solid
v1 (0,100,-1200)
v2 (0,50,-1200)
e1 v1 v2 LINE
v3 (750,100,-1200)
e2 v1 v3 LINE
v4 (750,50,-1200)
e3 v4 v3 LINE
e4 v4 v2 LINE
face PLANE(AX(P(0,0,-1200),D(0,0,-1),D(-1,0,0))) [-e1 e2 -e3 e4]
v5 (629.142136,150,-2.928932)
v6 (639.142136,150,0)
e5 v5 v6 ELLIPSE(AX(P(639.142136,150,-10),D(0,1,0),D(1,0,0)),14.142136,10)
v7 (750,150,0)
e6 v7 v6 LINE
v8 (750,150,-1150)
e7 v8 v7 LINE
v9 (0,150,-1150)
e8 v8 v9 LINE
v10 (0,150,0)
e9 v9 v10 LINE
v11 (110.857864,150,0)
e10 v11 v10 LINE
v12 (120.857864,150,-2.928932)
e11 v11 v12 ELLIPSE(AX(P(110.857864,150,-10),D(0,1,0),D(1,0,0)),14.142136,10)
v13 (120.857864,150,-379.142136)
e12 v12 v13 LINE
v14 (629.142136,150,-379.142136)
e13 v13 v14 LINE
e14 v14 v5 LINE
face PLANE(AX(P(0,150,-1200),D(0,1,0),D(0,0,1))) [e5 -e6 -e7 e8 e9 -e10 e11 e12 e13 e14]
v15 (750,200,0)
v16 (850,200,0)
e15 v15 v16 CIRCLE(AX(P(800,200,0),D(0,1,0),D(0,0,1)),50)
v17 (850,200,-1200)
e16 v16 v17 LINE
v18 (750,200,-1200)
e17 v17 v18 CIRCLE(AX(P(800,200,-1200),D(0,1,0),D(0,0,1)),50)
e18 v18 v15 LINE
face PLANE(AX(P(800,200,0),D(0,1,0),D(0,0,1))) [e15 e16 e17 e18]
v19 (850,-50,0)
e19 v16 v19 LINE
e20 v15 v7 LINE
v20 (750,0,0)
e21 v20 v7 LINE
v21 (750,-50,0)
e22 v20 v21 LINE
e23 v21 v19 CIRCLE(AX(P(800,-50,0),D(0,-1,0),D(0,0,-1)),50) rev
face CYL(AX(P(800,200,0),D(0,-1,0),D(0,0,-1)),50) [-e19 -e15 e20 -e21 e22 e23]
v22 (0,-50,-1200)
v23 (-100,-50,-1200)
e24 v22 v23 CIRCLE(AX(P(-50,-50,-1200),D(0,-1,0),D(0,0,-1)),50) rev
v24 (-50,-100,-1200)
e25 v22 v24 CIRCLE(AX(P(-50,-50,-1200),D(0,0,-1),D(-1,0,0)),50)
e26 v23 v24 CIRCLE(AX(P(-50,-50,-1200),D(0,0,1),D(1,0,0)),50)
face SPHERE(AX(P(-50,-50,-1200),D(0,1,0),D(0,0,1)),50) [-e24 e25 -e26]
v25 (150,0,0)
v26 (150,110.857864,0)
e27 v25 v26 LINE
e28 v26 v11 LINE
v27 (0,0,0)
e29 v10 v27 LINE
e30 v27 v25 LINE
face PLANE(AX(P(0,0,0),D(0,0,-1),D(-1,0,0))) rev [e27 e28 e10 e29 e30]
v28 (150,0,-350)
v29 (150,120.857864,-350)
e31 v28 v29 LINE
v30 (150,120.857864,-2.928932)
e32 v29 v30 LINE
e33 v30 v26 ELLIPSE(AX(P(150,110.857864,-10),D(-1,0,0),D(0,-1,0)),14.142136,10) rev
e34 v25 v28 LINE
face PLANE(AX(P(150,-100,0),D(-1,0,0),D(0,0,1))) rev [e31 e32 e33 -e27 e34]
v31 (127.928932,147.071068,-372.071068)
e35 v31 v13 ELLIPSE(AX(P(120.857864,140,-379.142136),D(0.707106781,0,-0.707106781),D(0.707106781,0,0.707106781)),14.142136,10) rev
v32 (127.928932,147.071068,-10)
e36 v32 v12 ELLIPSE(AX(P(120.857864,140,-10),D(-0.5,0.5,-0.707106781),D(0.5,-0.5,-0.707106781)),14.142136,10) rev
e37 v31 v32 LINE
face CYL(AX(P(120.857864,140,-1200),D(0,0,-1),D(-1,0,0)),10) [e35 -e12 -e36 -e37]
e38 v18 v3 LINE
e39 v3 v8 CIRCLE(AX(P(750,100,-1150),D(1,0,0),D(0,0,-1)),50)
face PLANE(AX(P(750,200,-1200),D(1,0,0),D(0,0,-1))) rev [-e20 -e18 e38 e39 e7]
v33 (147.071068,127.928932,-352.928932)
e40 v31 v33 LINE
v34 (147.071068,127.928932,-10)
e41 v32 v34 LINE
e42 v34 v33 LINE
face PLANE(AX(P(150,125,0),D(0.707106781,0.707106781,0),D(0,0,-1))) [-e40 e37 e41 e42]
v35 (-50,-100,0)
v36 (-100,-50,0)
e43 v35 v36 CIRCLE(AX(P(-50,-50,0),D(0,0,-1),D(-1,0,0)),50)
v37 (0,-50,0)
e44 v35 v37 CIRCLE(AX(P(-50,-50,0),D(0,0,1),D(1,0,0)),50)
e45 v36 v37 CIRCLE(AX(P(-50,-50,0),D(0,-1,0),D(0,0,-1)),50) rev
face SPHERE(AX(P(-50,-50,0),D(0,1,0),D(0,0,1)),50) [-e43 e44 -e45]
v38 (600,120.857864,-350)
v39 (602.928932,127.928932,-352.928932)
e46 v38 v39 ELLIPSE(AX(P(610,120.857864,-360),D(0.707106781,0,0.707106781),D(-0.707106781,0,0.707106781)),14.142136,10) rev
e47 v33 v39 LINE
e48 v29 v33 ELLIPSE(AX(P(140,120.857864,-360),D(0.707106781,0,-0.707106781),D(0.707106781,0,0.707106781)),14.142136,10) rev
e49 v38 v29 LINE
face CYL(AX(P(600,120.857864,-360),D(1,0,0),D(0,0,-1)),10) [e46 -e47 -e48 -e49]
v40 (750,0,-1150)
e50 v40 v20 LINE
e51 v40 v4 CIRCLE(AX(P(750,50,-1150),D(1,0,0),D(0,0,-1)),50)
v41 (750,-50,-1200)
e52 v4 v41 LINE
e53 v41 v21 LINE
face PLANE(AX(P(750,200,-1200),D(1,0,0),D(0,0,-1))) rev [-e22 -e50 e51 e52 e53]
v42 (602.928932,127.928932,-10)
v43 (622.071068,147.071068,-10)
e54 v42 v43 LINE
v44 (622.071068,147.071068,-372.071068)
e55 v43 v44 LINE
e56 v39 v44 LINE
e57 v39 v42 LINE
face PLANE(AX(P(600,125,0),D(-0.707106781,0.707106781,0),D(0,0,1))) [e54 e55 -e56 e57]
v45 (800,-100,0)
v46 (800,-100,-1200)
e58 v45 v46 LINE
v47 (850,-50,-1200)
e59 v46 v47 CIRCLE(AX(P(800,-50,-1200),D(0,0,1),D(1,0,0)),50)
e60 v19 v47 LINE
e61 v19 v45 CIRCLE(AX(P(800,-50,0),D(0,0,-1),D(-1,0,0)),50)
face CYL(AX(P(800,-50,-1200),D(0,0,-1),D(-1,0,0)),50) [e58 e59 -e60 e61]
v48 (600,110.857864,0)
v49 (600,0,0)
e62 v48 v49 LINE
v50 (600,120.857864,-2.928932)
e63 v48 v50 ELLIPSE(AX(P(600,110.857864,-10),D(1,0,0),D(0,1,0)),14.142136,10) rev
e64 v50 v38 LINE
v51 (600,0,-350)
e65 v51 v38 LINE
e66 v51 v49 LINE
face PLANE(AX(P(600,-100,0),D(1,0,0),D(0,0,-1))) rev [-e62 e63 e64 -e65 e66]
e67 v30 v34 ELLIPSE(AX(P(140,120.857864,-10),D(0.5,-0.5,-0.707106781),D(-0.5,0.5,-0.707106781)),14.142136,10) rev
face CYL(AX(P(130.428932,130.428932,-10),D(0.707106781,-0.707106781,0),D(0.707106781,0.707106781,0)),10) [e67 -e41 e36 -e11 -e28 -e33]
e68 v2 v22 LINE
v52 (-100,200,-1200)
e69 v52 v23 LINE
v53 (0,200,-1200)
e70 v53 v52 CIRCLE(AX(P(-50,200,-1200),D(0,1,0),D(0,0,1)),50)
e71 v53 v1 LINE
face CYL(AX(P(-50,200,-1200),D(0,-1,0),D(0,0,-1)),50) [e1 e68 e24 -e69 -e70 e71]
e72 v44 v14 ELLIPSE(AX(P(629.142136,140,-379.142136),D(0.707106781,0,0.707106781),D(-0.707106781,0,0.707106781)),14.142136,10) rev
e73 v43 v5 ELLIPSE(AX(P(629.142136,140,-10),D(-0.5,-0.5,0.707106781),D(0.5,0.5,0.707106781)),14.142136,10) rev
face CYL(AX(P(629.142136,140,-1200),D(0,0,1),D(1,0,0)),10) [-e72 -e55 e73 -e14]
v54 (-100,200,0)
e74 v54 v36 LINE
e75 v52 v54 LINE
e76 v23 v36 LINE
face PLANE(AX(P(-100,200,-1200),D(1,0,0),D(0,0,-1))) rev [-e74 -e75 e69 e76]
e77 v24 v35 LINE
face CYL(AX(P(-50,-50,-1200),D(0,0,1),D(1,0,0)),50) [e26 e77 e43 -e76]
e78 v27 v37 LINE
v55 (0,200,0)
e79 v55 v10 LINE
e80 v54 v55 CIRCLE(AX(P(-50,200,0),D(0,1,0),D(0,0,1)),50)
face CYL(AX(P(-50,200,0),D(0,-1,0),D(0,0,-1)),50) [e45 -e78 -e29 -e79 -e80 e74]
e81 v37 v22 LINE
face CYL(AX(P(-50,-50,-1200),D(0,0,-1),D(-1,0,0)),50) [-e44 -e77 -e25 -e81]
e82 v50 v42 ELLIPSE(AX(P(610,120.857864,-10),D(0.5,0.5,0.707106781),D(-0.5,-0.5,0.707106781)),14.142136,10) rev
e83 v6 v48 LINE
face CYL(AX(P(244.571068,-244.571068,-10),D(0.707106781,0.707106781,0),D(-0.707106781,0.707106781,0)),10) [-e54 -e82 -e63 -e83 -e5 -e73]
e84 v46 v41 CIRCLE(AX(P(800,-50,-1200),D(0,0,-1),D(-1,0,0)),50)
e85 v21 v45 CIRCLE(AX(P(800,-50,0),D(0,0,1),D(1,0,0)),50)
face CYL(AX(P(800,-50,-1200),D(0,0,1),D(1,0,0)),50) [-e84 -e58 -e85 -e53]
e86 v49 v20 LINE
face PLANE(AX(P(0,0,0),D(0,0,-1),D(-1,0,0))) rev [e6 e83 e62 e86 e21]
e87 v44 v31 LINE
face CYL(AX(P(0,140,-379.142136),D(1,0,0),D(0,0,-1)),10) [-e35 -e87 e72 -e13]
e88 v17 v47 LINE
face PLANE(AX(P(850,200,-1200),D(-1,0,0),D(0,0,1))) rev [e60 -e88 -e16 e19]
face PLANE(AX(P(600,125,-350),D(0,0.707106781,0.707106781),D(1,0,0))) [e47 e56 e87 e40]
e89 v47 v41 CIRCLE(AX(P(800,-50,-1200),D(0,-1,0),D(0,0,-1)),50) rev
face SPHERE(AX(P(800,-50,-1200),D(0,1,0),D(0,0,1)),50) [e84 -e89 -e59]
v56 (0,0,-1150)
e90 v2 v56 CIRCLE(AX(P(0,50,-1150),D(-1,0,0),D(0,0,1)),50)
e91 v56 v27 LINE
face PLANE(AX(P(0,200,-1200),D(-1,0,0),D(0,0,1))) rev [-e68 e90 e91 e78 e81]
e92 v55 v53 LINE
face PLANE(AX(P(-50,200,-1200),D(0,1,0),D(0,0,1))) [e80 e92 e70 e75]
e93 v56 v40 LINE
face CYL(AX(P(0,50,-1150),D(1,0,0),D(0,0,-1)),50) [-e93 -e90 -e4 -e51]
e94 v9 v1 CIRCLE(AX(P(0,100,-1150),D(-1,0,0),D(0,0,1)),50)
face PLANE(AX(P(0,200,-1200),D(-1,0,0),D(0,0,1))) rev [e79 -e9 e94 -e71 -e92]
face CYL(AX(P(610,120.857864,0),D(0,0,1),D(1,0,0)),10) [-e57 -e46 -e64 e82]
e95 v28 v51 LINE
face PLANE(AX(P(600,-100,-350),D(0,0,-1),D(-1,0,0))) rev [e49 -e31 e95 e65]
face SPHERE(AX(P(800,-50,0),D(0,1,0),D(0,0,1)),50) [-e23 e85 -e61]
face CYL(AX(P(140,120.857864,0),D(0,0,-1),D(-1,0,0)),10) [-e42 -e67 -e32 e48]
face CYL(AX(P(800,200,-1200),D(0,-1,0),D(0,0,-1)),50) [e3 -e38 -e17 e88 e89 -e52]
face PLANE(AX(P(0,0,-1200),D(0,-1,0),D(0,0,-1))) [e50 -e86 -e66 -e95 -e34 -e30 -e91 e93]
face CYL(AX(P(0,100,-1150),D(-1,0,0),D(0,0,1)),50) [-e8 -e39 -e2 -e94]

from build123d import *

# Parameters (mm, degrees)
SKETCH1_W                = 750
SKETCH1_H                = 150
BOSS_EXTRUDE1_DEPTH      = 1200
BOSS_EXTRUDE8_DEPTH      = 50
BOSS_EXTRUDE8_DEPTH_BACK = 250
FILLET2_R                = 50
FILLET3_R                = 50
SKETCH6_W                = 450
SKETCH6_H                = 350
CUT_EXTRUDE1_DEPTH       = 250
CHAMFER1_SIZE            = 25
CHAMFER2_SIZE            = 25
FILLET4_R                = 10


with BuildPart() as part:
    # Sketch1 → Boss-Extrude1 (new body)
    with BuildSketch(Plane.XY):
        with Locations((375, 75)):
            Rectangle(SKETCH1_W, SKETCH1_H)
    extrude(amount=-BOSS_EXTRUDE1_DEPTH)

    # Sketch2 → Boss-Extrude8 (add, two sides: drawn at the far end of the back side and taken through both)
    with BuildSketch(Plane(origin=(0, 150, 0), x_dir=(1, 0, 0), z_dir=(0, 1, 0)).offset(-BOSS_EXTRUDE8_DEPTH_BACK)):
        with BuildLine():
            Line((0, 1200), (0, 0))
            ThreePointArc((0, 0), (-50, -50), (-100, 0))
            Line((-100, 0), (-100, 1200))
            ThreePointArc((-100, 1200), (-50, 1250), (0, 1200))
        make_face()
        with BuildLine():
            Line((850, 1200), (850, 0))
            ThreePointArc((850, 0), (800, -50), (750, 0))
            Line((750, 0), (750, 1200))
            ThreePointArc((750, 1200), (800, 1250), (850, 1200))
        make_face()
    extrude(amount=BOSS_EXTRUDE8_DEPTH + BOSS_EXTRUDE8_DEPTH_BACK)

    # Fillet2
    fillet2_edges = [part.edges().sort_by_distance(p)[0] for p in [
        (-50, -100, -1250),
        (-100, -100, -600),
        (-50, -100, 50),
        (0, -100, -600),
        (800, -100, 50),
        (850, -100, -600),
        (800, -100, -1250),
        (750, -100, -600),
    ]]
    fillet(fillet2_edges, radius=FILLET2_R - 0.0001)  # a hair under: the kernel refuses the full size

    # Fillet3
    fillet3_edges = [part.edges().sort_by_distance(p)[0] for p in [
        (375, 150, -1200),
        (375, 0, -1200),
    ]]
    fillet(fillet3_edges, radius=FILLET3_R)

    # Sketch6 → Cut-Extrude1 (cut)
    with BuildSketch(Plane(origin=(0, 150, 0), x_dir=(1, 0, 0), z_dir=(0, 1, 0))):
        with Locations((375, 175)):
            Rectangle(SKETCH6_W, SKETCH6_H)
    extrude(amount=-CUT_EXTRUDE1_DEPTH, mode=Mode.SUBTRACT)

    # Chamfer1
    chamfer1_edges = [part.edges().sort_by_distance(p)[0] for p in [
        (375, 150, -350),
    ]]
    chamfer(chamfer1_edges, length=CHAMFER1_SIZE)

    # Chamfer2
    chamfer2_edges = [part.edges().sort_by_distance(p)[0] for p in [
        (150, 150, -187.5),
        (600, 150, -187.5),
    ]]
    chamfer(chamfer2_edges, length=CHAMFER2_SIZE)

    # Fillet4
    fillet4_edges = [part.edges().sort_by_distance(p)[0] for p in [
        (375, 125, -350),
        (375, 150, -375),
        (150, 125, -175),
        (137.5, 137.5, 0),
        (625, 150, -187.5),
        (125, 150, -187.5),
        (600, 125, -175),
        (612.5, 137.5, 0),
    ]]
    fillet(fillet4_edges, radius=FILLET4_R)


solid = part.part
